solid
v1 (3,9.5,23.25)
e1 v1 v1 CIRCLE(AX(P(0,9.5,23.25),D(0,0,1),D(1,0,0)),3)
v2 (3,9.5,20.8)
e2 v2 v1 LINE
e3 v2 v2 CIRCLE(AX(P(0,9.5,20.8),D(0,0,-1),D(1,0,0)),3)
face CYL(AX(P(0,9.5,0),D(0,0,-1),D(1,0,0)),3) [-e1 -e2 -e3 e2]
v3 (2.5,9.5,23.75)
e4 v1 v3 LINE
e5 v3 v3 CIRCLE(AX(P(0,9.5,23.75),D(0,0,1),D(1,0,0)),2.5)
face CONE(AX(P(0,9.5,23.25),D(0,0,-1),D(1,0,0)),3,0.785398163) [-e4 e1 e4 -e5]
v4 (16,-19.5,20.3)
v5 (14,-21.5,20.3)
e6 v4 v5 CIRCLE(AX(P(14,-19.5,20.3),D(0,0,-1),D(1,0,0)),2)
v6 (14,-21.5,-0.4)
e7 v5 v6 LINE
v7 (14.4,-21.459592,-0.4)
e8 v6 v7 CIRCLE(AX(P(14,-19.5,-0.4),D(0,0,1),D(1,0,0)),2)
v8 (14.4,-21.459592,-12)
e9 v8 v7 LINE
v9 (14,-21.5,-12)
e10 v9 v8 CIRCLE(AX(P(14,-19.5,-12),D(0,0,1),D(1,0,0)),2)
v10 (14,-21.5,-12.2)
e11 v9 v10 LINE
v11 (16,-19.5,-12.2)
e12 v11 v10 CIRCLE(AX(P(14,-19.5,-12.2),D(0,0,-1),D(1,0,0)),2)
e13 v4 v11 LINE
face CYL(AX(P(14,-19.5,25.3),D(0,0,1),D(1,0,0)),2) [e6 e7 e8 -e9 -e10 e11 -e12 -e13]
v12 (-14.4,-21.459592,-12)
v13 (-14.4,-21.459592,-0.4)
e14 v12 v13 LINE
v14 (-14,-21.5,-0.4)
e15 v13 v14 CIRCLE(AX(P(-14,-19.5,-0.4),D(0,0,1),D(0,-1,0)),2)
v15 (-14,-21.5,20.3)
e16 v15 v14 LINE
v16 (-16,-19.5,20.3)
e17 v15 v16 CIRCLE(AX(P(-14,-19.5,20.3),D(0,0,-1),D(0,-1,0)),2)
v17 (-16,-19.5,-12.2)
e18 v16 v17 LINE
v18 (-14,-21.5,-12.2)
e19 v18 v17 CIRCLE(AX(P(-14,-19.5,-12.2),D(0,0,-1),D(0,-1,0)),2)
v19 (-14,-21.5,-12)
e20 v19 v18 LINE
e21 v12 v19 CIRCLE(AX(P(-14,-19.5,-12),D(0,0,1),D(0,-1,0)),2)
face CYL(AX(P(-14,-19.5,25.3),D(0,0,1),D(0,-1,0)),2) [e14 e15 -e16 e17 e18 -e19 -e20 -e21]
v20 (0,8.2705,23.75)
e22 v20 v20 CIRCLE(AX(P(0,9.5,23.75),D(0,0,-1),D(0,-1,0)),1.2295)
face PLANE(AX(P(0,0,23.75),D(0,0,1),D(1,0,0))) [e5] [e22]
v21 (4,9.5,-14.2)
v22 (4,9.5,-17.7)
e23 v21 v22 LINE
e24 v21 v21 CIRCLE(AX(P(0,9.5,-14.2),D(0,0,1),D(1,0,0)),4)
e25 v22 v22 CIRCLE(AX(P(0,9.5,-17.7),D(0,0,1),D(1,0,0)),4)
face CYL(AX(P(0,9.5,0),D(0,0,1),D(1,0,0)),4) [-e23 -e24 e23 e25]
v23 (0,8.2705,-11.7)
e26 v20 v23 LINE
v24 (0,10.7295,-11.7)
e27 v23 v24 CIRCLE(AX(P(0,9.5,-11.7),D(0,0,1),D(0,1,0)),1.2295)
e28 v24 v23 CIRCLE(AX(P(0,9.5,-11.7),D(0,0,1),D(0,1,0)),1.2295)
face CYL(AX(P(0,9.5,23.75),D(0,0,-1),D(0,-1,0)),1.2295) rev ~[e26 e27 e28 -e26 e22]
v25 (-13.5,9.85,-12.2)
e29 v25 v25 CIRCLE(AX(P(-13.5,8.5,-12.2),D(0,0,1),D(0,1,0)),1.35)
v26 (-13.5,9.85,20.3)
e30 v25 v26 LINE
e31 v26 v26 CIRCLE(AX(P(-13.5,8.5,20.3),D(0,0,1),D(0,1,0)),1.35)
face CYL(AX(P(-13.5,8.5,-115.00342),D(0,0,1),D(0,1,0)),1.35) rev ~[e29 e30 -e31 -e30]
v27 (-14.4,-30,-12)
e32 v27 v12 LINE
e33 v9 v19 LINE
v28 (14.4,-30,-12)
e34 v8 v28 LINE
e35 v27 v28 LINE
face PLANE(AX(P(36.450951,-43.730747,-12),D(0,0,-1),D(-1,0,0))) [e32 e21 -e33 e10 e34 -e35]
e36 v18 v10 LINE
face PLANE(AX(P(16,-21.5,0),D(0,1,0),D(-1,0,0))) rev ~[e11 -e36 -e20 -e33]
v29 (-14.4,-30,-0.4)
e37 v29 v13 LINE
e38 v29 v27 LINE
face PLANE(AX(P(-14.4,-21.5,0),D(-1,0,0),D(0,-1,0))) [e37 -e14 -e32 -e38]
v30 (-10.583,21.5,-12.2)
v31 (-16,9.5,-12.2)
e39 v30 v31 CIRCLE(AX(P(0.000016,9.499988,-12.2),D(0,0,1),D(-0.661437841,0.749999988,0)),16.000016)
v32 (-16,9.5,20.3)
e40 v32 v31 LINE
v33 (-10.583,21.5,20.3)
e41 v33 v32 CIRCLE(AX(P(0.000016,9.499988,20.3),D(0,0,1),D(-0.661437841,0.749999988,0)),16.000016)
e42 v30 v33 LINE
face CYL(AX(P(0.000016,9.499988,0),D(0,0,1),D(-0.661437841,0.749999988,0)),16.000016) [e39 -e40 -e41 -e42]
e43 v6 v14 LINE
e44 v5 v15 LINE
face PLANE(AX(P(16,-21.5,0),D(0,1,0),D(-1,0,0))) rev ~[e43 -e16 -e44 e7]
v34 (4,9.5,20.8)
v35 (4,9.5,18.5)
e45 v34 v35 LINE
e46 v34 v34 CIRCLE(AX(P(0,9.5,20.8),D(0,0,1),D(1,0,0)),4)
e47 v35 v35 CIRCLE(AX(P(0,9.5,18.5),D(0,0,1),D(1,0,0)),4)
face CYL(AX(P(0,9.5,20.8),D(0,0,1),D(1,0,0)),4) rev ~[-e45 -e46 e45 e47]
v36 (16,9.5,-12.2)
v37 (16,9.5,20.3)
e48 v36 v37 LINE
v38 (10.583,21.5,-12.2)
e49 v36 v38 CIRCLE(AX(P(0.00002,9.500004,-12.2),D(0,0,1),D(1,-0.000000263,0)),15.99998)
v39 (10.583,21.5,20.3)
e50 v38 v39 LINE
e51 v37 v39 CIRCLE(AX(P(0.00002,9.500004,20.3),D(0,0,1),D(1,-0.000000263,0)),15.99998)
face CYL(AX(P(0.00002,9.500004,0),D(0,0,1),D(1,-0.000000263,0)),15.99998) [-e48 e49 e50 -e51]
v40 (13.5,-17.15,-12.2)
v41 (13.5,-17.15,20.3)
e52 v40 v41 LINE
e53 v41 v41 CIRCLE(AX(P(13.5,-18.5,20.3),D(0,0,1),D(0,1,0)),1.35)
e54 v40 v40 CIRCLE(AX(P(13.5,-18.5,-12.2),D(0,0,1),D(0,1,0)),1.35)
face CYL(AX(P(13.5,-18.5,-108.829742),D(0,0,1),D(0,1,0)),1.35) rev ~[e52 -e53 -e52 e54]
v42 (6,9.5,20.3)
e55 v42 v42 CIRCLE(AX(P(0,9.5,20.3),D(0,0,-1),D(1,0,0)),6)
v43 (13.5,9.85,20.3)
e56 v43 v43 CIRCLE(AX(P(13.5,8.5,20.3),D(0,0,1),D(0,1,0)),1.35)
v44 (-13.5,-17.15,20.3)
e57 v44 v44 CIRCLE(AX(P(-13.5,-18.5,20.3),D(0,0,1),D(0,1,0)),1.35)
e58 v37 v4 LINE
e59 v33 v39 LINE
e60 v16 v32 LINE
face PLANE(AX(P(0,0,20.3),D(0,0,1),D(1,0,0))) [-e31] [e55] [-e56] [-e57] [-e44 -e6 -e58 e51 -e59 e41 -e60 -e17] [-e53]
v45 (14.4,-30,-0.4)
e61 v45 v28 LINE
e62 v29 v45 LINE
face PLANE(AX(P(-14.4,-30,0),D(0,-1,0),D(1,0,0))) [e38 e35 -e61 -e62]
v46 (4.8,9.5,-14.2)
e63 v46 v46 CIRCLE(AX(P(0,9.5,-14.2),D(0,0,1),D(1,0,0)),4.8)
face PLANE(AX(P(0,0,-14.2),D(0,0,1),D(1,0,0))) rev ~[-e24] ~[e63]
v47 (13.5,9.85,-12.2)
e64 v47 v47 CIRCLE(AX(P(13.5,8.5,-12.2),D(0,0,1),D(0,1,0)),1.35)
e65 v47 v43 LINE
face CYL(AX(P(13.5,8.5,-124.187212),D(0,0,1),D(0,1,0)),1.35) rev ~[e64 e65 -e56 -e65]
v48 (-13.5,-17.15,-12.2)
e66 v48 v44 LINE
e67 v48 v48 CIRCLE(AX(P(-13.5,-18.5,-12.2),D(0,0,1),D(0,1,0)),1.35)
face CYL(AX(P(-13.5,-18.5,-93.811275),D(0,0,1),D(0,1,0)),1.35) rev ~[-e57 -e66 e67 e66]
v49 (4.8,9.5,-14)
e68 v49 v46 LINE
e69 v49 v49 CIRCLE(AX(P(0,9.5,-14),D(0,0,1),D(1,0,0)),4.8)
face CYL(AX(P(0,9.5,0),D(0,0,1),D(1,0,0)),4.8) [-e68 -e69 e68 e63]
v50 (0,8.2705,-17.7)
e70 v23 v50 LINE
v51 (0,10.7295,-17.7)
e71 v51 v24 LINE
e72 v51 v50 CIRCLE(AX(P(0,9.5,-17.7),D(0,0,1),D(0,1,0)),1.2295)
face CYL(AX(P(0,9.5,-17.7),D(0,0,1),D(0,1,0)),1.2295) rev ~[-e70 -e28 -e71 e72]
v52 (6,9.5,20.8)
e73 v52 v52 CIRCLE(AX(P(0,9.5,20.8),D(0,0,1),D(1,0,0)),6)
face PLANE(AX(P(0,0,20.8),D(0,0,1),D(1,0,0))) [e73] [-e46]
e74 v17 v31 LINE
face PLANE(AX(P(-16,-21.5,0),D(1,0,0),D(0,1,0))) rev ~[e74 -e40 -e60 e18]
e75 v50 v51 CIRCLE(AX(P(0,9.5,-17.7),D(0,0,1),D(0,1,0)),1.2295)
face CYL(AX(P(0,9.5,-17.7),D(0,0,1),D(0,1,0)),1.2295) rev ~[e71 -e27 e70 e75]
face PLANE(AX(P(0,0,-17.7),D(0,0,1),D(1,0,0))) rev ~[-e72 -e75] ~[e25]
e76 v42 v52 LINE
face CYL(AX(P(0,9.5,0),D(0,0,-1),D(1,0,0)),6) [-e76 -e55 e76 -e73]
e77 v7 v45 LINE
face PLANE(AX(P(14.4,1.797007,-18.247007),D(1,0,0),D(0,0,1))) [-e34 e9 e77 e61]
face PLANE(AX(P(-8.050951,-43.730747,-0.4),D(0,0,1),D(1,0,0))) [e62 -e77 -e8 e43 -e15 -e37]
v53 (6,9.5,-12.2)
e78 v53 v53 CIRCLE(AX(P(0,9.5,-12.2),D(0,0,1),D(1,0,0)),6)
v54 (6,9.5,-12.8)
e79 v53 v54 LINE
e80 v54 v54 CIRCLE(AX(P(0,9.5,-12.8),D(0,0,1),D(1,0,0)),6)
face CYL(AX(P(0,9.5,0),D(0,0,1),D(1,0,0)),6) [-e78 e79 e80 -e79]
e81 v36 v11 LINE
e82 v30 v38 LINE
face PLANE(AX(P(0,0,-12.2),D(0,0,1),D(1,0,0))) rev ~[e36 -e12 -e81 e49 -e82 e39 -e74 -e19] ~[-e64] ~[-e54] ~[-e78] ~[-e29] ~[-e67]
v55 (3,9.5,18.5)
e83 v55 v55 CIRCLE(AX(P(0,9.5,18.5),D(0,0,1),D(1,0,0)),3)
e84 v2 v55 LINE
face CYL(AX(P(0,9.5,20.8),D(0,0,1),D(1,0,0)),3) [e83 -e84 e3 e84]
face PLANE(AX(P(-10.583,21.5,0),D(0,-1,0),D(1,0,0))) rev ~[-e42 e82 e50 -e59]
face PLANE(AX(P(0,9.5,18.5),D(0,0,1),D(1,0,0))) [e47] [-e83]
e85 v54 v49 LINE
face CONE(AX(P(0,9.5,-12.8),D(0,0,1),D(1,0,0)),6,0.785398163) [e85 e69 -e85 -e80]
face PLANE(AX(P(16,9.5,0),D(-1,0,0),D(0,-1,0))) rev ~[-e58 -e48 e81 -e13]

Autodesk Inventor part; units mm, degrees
ref_plane "YZ Plane" through (0, 0, 0) normal (1, 0, 0) x (0, 1, 0)
ref_plane "XZ Plane" through (0, 0, 0) normal (0, 1, 0) x (-1, 0, 0)
ref_plane "XY Plane" through (0, 0, 0) normal (0, 0, 1) x (1, 0, 0)
sketch "スケッチ1" plane through (0, 0, 0) normal (0, 0, 1) x (1, 0, 0)
  line L0 (-16, 21.5) -> (-10.583, 21.5) construction
  line L1 (16, 21.5) -> (16, 9.5) construction
  line L2 (16, -21.5) -> (-16, -21.5)
  line L3 (-16, -21.5) -> (-16, 9.5)
  line L4 (-16, 21.5) -> (16, -21.5) construction
  line L5 (16, 21.5) -> (-16, -21.5) construction
  line L6 (-14.4, -21.5) -> (-14.4, -30)
  line L7 (-14.4, -30) -> (14.4, -30)
  line L8 (0, 21.5) -> (0, -21.5) construction
  line L9 (14.4, -21.5) -> (14.4, -30)
  line L10 (-13.5, 21.5) -> (-13.5, -21.5) construction
  circle A0 centre (0, 9.5) radius 6
  circle A1 centre (0, 9.5) radius 4
  arc A2 (-10.583, 21.5) -> (-16, 9.5) centre (0, 9.5) ccw
  arc A3 (16, 9.5) -> (10.583, 21.5) centre (0, 9.5) ccw
  line L11 (-10.583, 21.5) -> (10.583, 21.5)
  line L12 (-16, 9.5) -> (-16, 21.5) construction
  line L13 (10.583, 21.5) -> (16, 21.5) construction
  line L14 (16, 9.5) -> (16, -21.5)
  circle A4 centre (0, 9.5) radius 3
  circle A5 centre (0, 9.5) radius 4.8
  point P0 (0, 0)
  point P1 (-13.5, 8.5)
  point P2 (-13.5, -18.5)
  point P3 (13.5, 8.5)
  point P4 (13.5, -18.5)
  dimension "d0" = 32
  dimension "d1" = 43
  dimension "d4" = 28.8
  dimension "d5" = 8.5
  dimension "d8" = 27
  dimension "d9" = 8.5
  dimension "d12" = 18.5
  dimension "d13" = 12
  dimension "d14" = 8
  dimension "d15" = 9.5
  dimension "d17" = 16
  dimension "d32" = 13.5
  dimension "d47" = 6
  dimension "d67" = 9.6
extrude "押し出し1" add sketch "スケッチ1" against normal blind 12.2 contours L2 L3 A2 L11 A3 L14 | A0 | A1 | A4 | A5
extrude "押し出し2" add sketch "スケッチ1" against normal blind 12 contours L9 L7 L6 L2
extrude "押し出し3" add sketch "スケッチ1" against normal blind 14 contours A0 | A1 | A4 | A5
extrude "押し出し4" add sketch "スケッチ1" against normal blind 17.7 contours A1 | A4
chamfer "面取り1" distance 1.2 angle 45 1 edges at (-6, 9.5, -14)
sketch "スケッチ2" plane through (0, 9.5, -17.7) normal (0, 0, -1) x (-1, 0, 0)
  circle A0 centre (0, 0) radius 4 projected
  point P0 (0, -9.5)
hole "穴1" at (0, 9.5, -17.7) direction (0, 0, 1) diameter 2.459 depth 6 thread size "M3x0.5" class "6H" standard "ANSI Metric M Profile"
extrude "押し出し5" add sketch "スケッチ1" along normal blind 20.3 contours L2 L3 A2 L11 A3 L14 | A0 | A1 | A4 | A5
hole "穴2" at (-13.5, 8.5, 0) at (-13.5, -18.5, 0) at (13.5, 8.5, 0) at (13.5, -18.5, 0) direction (0, 0, 1) diameter 2.7 end through all both
extrude "押し出し6" cut sketch "スケッチ1" against normal blind 0.4 contours L9 L7 L6 L2
fillet "フィレット1" radius 2 2 edges at (16, -21.5, 4.05) (-16, -21.5, 4.05)
extrude "押し出し7" add sketch "スケッチ1" along normal blind 20.8 contours A0 | A1 | A4 | A5
extrude "押し出し8" add sketch "スケッチ1" along normal blind 23.75 contours A4
sketch "スケッチ3" plane through (0, 9.5, 23.75) normal (0, 0, 1) x (1, 0, 0)
  circle A0 centre (0, 0) radius 1.2295 projected
  point P0 (0, -9.5)
hole "穴3" at (0, 9.5, 23.75) direction (0, 0, -1) diameter 2.459 end through all thread size "M3x0.5" class "6H" standard "ANSI Metric M Profile"
sketch "スケッチ4" plane through (0, 9.5, 20.8) normal (0, 0, 1) x (1, 0, 0)
  circle A0 centre (0, 0) radius 4
  circle A1 centre (0, 0) radius 3
  point P0 (0, -9.5)
extrude "押し出し9" cut sketch "スケッチ4" against normal blind 2.3
chamfer "面取り2" distance 0.5 angle 45 1 edges at (-3, 9.5, 23.75)
extrude "押し出し10" add sketch "スケッチ1" against normal blind 14.2 contours A5
properties part number "B3M10xx"
